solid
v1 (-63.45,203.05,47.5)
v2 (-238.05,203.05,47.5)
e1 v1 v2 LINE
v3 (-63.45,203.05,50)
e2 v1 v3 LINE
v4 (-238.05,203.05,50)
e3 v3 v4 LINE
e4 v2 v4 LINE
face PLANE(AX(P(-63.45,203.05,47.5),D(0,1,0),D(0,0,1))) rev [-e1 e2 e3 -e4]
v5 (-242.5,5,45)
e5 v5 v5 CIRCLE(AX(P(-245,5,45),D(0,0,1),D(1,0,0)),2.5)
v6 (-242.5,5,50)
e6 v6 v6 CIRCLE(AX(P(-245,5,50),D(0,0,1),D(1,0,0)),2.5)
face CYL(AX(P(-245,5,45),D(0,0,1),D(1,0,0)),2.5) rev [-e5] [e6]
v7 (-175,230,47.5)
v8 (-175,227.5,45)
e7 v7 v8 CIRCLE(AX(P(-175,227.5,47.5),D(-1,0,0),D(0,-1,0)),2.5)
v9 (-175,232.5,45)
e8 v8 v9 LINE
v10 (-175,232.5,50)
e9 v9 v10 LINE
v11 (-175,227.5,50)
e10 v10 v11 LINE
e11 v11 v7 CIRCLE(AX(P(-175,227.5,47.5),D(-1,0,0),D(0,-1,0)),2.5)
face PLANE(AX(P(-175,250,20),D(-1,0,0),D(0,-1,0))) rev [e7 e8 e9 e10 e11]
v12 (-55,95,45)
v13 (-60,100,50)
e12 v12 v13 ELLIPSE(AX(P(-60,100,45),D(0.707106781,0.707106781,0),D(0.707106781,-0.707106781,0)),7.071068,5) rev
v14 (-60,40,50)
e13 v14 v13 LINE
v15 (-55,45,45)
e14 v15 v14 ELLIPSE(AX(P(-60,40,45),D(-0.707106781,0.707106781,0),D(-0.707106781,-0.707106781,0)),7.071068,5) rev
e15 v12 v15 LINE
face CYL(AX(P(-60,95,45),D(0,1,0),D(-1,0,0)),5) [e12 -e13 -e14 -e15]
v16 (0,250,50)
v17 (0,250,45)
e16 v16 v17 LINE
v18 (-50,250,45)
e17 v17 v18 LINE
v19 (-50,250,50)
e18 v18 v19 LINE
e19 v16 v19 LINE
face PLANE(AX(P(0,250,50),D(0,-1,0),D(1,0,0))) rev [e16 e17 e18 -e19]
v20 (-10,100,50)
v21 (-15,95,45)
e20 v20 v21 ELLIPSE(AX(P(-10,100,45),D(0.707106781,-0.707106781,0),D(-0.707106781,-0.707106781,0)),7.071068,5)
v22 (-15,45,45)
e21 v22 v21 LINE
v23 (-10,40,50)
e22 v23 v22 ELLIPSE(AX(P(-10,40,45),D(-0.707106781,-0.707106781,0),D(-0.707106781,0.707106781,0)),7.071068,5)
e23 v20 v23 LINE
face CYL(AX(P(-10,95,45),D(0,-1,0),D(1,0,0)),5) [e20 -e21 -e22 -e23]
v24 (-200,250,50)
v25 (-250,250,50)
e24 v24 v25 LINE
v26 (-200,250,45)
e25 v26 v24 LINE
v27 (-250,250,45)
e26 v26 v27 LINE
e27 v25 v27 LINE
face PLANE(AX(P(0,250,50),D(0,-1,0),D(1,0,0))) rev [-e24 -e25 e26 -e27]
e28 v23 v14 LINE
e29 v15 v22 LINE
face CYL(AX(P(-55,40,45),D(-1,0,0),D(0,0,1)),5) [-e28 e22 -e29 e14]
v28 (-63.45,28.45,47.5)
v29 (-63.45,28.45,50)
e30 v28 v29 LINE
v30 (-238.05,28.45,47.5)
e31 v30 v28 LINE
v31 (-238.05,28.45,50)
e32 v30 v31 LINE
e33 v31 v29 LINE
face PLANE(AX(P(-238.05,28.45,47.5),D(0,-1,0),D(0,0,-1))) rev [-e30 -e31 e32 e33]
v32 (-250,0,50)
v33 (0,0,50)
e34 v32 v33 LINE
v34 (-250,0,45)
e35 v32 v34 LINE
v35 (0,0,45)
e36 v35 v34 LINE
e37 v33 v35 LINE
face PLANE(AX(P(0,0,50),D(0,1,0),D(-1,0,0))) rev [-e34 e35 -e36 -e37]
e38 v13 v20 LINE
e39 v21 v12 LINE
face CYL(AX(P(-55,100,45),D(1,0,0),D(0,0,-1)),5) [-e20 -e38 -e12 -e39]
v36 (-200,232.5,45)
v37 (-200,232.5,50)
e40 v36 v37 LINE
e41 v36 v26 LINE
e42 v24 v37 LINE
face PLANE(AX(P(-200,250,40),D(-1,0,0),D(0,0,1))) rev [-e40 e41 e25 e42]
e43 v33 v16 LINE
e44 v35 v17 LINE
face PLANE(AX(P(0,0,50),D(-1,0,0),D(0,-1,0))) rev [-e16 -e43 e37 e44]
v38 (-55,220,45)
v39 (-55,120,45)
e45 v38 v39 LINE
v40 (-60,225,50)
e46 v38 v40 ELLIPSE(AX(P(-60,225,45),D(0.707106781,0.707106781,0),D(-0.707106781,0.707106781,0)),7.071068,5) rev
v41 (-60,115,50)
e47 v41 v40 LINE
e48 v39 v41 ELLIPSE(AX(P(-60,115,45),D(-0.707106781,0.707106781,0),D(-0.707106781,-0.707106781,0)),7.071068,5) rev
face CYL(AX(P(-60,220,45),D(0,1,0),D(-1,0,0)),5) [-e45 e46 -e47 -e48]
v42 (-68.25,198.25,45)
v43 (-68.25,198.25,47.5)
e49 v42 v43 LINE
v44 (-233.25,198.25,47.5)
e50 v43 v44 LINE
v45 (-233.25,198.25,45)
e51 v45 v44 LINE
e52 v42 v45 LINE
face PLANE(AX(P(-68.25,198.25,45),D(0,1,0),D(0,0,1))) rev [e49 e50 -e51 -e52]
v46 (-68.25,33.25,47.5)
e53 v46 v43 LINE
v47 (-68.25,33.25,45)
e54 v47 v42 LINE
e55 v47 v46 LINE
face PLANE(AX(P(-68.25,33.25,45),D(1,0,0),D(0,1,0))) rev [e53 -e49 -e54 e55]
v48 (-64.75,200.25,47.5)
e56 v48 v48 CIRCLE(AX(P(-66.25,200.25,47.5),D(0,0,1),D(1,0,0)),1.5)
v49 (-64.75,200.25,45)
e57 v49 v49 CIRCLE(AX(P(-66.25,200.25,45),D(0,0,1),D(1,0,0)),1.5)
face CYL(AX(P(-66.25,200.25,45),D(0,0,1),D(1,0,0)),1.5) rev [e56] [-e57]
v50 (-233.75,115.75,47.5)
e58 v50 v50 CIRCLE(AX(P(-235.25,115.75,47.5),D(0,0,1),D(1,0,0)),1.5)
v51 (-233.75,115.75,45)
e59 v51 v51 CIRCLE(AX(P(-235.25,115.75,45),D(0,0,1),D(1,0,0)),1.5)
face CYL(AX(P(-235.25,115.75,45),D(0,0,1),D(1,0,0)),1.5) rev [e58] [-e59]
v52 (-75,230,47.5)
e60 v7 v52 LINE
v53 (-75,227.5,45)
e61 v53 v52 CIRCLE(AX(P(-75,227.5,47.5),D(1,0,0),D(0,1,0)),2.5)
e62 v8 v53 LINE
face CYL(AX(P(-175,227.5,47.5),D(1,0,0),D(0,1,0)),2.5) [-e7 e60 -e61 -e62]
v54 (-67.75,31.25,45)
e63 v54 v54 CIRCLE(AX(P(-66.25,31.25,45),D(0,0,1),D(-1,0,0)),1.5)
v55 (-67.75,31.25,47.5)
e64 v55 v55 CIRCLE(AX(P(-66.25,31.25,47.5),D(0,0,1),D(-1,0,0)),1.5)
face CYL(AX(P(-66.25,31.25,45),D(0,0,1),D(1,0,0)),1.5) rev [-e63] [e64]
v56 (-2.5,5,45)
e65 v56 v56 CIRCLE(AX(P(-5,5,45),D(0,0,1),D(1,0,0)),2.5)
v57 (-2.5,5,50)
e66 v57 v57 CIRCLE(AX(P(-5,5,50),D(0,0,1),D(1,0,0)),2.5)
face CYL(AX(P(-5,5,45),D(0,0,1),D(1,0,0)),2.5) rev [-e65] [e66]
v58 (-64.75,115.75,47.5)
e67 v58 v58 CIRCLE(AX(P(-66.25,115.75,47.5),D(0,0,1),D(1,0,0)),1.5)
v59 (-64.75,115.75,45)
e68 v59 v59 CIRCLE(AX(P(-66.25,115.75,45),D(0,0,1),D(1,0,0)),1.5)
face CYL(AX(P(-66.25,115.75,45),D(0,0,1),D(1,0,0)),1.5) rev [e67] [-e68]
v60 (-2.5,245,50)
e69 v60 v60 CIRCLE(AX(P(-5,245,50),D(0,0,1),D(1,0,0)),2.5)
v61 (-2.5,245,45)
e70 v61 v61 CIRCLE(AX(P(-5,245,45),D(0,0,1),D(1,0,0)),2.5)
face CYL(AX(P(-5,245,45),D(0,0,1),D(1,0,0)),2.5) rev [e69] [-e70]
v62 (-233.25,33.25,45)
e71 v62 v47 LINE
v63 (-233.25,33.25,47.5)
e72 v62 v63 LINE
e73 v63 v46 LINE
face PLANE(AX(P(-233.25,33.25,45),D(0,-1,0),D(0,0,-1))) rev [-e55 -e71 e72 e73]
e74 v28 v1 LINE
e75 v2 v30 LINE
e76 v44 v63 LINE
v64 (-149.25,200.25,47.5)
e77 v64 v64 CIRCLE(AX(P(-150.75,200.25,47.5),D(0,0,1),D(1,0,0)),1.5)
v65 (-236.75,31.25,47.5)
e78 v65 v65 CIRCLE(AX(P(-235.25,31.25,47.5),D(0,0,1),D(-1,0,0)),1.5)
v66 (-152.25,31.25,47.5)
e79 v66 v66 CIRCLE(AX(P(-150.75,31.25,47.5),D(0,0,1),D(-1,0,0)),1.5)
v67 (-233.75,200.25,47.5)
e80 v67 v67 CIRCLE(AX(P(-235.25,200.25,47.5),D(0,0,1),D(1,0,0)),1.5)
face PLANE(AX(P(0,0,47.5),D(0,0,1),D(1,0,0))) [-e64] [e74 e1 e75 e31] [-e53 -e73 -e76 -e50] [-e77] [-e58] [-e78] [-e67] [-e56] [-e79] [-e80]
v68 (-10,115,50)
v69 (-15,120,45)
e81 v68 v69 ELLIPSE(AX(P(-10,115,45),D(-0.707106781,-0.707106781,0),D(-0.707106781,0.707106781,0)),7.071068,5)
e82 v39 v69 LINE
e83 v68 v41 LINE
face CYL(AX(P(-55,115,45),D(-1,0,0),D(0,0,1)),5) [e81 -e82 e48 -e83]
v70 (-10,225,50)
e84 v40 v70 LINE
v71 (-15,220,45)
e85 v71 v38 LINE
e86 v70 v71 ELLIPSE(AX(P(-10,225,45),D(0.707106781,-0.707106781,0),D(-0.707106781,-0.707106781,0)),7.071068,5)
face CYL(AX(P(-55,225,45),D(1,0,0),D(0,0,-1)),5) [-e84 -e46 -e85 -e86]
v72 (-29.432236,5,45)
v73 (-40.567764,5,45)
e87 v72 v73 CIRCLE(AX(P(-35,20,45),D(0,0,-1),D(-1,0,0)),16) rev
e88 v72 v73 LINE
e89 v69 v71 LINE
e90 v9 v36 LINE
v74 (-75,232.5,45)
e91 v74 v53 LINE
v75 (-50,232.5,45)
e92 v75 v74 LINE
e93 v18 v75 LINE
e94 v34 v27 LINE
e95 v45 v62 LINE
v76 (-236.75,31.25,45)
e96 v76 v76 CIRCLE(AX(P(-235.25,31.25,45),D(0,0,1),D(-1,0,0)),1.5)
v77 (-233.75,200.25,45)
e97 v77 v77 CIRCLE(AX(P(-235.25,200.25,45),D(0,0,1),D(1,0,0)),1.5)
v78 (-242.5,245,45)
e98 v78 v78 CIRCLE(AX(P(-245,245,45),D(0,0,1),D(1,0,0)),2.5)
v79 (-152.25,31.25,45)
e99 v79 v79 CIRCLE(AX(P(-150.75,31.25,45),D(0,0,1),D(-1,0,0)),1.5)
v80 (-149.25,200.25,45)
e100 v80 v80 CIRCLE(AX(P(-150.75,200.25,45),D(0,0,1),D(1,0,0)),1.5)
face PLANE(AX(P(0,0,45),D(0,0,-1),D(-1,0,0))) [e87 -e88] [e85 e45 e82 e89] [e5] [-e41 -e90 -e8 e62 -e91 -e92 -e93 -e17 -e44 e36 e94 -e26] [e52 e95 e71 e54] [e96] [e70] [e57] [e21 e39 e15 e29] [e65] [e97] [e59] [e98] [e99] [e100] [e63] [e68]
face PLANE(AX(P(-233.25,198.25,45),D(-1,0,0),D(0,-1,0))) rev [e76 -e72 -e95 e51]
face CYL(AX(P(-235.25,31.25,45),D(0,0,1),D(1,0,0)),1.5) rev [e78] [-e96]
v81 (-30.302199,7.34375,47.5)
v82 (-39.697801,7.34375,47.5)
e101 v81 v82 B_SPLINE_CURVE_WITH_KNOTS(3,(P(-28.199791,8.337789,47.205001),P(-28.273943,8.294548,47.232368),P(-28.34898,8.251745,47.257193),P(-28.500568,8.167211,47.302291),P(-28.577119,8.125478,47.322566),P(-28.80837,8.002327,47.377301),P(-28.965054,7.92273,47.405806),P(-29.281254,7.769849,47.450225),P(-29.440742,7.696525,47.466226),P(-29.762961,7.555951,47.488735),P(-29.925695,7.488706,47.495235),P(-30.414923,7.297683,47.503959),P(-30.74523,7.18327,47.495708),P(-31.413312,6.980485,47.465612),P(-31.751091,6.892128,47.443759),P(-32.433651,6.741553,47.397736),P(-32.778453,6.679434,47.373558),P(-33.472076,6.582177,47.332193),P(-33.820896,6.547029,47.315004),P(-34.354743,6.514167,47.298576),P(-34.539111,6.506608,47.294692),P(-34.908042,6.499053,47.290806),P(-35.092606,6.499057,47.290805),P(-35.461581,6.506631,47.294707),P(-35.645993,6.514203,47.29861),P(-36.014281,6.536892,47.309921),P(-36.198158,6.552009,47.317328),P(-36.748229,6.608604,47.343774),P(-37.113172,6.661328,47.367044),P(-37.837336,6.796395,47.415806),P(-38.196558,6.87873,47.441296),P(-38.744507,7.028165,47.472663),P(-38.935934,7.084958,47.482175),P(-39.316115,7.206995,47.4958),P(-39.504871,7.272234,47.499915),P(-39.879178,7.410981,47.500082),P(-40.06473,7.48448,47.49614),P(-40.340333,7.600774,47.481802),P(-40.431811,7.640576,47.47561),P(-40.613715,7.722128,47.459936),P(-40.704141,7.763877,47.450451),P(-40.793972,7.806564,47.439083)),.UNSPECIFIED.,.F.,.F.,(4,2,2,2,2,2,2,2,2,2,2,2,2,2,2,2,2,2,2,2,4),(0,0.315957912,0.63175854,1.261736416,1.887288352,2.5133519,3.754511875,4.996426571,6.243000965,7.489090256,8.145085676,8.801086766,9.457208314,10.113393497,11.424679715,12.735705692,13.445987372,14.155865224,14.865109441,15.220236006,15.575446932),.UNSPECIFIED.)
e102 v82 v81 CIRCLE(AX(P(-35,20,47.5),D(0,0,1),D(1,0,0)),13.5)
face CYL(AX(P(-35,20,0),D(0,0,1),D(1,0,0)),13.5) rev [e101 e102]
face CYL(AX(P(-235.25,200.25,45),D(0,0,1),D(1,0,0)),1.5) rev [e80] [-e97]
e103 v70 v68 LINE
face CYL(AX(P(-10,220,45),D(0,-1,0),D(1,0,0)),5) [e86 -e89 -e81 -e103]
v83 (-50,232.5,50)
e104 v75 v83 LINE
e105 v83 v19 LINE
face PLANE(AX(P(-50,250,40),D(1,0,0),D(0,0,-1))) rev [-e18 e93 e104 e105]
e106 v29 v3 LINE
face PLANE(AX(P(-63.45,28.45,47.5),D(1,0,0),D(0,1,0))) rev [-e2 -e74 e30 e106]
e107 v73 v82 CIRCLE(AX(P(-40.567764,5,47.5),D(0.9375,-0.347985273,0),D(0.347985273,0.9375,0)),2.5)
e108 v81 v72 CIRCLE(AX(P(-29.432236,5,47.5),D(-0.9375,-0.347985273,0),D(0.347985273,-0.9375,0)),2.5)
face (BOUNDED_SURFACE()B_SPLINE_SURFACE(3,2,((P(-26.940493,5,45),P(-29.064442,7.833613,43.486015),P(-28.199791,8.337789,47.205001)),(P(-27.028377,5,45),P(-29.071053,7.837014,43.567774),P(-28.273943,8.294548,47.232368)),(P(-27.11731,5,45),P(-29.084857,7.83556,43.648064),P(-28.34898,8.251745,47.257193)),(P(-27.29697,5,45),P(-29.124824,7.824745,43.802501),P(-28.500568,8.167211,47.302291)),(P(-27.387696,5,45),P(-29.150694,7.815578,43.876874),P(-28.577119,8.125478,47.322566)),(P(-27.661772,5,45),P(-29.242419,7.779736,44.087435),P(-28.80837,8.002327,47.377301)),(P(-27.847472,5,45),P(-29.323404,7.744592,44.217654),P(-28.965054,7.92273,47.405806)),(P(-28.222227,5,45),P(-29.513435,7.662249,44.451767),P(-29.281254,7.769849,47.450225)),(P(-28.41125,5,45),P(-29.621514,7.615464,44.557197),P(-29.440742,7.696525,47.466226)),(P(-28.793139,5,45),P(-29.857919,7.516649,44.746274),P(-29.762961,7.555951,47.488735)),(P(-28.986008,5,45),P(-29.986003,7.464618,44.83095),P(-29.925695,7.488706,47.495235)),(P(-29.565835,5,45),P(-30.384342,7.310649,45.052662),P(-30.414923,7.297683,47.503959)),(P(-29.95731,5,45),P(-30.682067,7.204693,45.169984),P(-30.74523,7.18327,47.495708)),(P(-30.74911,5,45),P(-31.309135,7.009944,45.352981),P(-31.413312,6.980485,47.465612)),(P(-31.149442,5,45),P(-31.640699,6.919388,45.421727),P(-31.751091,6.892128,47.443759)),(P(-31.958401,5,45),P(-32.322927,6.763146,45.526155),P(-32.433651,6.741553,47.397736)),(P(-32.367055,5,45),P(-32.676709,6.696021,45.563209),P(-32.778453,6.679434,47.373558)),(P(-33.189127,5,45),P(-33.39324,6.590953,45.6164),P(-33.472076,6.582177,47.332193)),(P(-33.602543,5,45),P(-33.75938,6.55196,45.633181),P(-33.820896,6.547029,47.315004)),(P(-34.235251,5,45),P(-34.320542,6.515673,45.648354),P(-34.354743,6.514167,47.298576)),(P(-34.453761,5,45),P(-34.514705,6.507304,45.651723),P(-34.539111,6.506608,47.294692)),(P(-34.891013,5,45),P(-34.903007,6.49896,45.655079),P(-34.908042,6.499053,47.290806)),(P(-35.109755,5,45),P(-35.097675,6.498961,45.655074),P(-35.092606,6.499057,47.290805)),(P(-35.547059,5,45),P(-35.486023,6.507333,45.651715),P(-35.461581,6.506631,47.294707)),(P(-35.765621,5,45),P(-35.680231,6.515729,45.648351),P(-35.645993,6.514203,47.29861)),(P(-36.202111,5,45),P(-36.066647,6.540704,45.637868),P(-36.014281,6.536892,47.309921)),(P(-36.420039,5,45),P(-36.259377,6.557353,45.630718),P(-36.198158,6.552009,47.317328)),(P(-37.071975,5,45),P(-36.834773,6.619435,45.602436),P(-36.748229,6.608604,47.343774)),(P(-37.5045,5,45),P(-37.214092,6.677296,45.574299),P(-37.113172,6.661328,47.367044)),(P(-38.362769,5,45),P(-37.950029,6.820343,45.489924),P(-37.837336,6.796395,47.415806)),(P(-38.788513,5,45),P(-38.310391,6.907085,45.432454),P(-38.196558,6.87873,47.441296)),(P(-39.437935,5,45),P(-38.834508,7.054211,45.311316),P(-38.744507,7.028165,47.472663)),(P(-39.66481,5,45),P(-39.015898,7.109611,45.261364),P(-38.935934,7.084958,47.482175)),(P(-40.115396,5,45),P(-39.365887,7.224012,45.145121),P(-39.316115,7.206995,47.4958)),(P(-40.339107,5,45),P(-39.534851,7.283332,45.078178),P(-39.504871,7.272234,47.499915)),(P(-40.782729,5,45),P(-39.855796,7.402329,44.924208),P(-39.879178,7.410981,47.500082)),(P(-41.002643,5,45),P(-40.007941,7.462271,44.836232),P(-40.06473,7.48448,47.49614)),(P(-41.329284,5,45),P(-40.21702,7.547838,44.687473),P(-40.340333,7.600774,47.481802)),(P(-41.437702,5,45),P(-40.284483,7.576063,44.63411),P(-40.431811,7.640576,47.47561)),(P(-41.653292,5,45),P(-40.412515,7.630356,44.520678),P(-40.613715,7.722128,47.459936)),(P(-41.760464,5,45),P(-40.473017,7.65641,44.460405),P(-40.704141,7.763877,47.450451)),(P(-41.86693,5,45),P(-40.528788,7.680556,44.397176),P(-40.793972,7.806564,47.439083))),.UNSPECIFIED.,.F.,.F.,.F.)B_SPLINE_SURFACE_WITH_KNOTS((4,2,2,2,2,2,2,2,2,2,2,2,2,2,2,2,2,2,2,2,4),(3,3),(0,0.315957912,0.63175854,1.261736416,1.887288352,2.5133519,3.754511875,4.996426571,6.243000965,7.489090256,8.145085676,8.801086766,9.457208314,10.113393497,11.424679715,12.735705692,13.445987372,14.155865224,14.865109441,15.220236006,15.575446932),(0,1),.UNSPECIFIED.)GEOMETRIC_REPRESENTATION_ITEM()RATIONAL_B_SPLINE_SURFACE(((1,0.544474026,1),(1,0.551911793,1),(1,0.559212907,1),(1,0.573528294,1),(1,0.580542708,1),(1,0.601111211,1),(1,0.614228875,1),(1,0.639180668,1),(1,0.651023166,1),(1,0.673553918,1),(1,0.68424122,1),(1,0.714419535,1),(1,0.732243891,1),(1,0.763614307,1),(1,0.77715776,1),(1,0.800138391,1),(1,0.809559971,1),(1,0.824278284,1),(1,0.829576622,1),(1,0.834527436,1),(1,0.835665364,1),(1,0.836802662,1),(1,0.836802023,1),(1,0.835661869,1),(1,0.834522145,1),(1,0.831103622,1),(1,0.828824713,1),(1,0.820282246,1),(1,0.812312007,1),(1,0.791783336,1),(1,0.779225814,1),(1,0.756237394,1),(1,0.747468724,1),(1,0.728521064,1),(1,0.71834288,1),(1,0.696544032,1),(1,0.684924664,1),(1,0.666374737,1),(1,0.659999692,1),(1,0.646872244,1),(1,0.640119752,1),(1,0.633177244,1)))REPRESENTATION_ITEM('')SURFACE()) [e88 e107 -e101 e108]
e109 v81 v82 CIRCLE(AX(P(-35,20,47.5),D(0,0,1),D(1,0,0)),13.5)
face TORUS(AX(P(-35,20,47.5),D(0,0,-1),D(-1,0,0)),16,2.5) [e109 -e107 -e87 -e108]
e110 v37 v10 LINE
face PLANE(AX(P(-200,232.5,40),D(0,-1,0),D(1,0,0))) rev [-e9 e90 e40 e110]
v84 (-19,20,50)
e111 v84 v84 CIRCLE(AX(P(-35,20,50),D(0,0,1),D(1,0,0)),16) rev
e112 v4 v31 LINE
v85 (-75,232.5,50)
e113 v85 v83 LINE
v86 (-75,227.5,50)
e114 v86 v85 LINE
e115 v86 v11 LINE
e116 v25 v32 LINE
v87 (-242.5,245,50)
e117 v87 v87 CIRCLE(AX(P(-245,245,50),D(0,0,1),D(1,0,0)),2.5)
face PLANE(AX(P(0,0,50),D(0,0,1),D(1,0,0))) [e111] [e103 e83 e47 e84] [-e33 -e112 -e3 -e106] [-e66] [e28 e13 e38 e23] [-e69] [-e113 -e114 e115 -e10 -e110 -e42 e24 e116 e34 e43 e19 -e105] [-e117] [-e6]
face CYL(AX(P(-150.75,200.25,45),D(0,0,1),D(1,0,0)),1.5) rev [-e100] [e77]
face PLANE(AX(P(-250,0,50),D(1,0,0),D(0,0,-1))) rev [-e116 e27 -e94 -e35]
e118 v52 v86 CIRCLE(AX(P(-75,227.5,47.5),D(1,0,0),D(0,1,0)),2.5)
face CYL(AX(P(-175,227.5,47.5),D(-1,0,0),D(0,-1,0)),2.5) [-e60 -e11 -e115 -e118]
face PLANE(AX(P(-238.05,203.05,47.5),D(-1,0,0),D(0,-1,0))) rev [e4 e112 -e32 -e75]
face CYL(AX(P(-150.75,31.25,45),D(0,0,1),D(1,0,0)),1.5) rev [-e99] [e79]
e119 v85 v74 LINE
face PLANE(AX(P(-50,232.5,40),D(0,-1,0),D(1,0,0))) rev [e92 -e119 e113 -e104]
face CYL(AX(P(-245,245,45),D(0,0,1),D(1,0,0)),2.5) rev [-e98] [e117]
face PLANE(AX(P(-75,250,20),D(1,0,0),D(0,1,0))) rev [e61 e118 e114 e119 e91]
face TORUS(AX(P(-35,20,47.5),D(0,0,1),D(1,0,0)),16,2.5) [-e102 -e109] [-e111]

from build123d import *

# Parameters (mm, degrees)
SKETCH1_W                        = 250
SKETCH1_H                        = 250
BOSS_EXTRUDE1_DEPTH              = 50
SKETCH2_W                        = 40
SKETCH2_H                        = 100
SKETCH2_H_2                      = 50
CUT_EXTRUDE1_DEPTH               = 45
FILLET1_R                        = 5
FILLET2_R                        = 5
SKETCH5_R                        = 6.25
CUT_EXTRUDE2_DEPTH               = 22
FILLET5_R                        = 1.5
LPATTERN4_COUNT                  = 10
LPATTERN4_PITCH                  = 16.5
LPATTERN4_COUNT_DIR2             = 10
LPATTERN4_PITCH_DIR2             = 16.5
FILLET5_OF_LPATTERN4_R           = 1.5
CUT_EXTRUDE4_DEPTH               = 45
SKETCH8_W                        = 100
SKETCH8_H                        = 20
CUT_EXTRUDE5_DEPTH               = 30
FILLET6_R                        = 2.5
FILLET7_R                        = 2
SKETCH10_R                       = 13.5
CUT_EXTRUDE6_DEPTH               = 358.071421427
SKETCH4_W                        = 25
SKETCH4_H                        = 17.5
CUT_EXTRUDE7_DEPTH               = 10
VERRUNDUNG1_R                    = 2.5
SKIZZE2_W                        = 25
SKIZZE2_H                        = 5
AUFSATZ_LINEAR_AUSTRAGEN1_DEPTH  = 12.5
AUFSATZ_LINEAR_AUSTRAGEN2_DEPTH  = 10
SKIZZE11_W                       = 164
SKIZZE11_H                       = 164
SCHNITT_LINEAR_AUSTRAGEN6_DEPTH  = 10
SKIZZE12_W                       = 174
SKIZZE12_H                       = 174
SCHNITT_LINEAR_AUSTRAGEN7_DEPTH  = 2.5
SKIZZE13_R                       = 1.5
SCHNITT_LINEAR_AUSTRAGEN8_DEPTH  = 2.5
SKIZZE14_W                       = 10
SKIZZE14_H                       = 10
AUFSATZ_LINEAR_AUSTRAGEN3_DEPTH  = 45
SKIZZE16_W                       = 45
SKIZZE16_H                       = 250
SCHNITT_LINEAR_AUSTRAGEN9_DEPTH  = 358.071421427
SKIZZE17_R                       = 2.5
SCHNITT_LINEAR_AUSTRAGEN10_DEPTH = 5
SKIZZE18_W                       = 174.6
SKIZZE18_H                       = 174.6
SCHNITT_LINEAR_AUSTRAGEN11_DEPTH = 2.5
SKIZZE19_W                       = 165
SKIZZE19_H                       = 165
SCHNITT_LINEAR_AUSTRAGEN12_DEPTH = 2.5


with BuildPart() as part:
    # Sketch1 → Boss-Extrude1 (new body)
    with BuildSketch(Plane.XY):
        with Locations((-125, 125)):
            Rectangle(SKETCH1_W, SKETCH1_H)
    extrude(amount=BOSS_EXTRUDE1_DEPTH)

    # Sketch2 → Cut-Extrude1 (cut)
    with BuildSketch(Plane.XY.offset(50)):
        with Locations((-35, 170)):
            Rectangle(SKETCH2_W, SKETCH2_H)
        with Locations((-35, 70)):
            Rectangle(SKETCH2_W, SKETCH2_H_2)
    extrude(amount=-CUT_EXTRUDE1_DEPTH, mode=Mode.SUBTRACT)

    # Fillet1
    fillet1_edges = [part.edges().sort_by_distance(p)[0] for p in [
        (-55, 170, 50),
        (-35, 120, 50),
        (-15, 170, 50),
        (-35, 220, 50),
    ]]
    fillet(fillet1_edges, radius=FILLET1_R)

    # Fillet2
    fillet2_edges = [part.edges().sort_by_distance(p)[0] for p in [
        (-55, 70, 50),
        (-35, 45, 50),
        (-15, 70, 50),
        (-35, 95, 50),
    ]]
    fillet(fillet2_edges, radius=FILLET2_R)

    # Sketch5 → Cut-Extrude2 (cut)
    with BuildSketch(Plane.XY.offset(50)):
        with Locations((-225, 190)):
            Circle(SKETCH5_R)
    cut_extrude2 = extrude(amount=-CUT_EXTRUDE2_DEPTH, mode=Mode.SUBTRACT)

    # Fillet5
    fillet5_edges = [part.edges().sort_by_distance(p)[0] for p in [
        (-231.25, 190, 50),
    ]]
    fillet(fillet5_edges, radius=FILLET5_R)

    # LPattern4: Cut-Extrude2 10 × 10
    with Locations(*[(i * LPATTERN4_PITCH, -j * LPATTERN4_PITCH_DIR2, 0) for i in range(LPATTERN4_COUNT) for j in range(LPATTERN4_COUNT_DIR2) if (i, j) != (0, 0)]):
        add(cut_extrude2, mode=Mode.SUBTRACT)

    # Fillet5 of LPattern4
    fillet5_of_lpattern4_edges = [part.edges().sort_by_distance(p)[0] for p in [
        (-231.25, 173.5, 50),
        (-231.25, 157, 50),
        (-231.25, 140.5, 50),
        (-231.25, 124, 50),
        (-231.25, 107.5, 50),
        (-231.25, 91, 50),
        (-231.25, 74.5, 50),
        (-231.25, 58, 50),
        (-231.25, 41.5, 50),
        (-214.75, 190, 50),
        (-214.75, 173.5, 50),
        (-214.75, 157, 50),
        (-214.75, 140.5, 50),
        (-214.75, 124, 50),
        (-214.75, 107.5, 50),
        (-214.75, 91, 50),
        (-214.75, 74.5, 50),
        (-214.75, 58, 50),
        (-214.75, 41.5, 50),
        (-198.25, 190, 50),
        (-198.25, 173.5, 50),
        (-198.25, 157, 50),
        (-198.25, 140.5, 50),
        (-198.25, 124, 50),
        (-198.25, 107.5, 50),
        (-198.25, 91, 50),
        (-198.25, 74.5, 50),
        (-198.25, 58, 50),
        (-198.25, 41.5, 50),
        (-181.75, 190, 50),
        (-181.75, 173.5, 50),
        (-181.75, 157, 50),
        (-181.75, 140.5, 50),
        (-181.75, 124, 50),
        (-181.75, 107.5, 50),
        (-181.75, 91, 50),
        (-181.75, 74.5, 50),
        (-181.75, 58, 50),
        (-181.75, 41.5, 50),
        (-165.25, 190, 50),
        (-165.25, 173.5, 50),
        (-165.25, 157, 50),
        (-165.25, 140.5, 50),
        (-165.25, 124, 50),
        (-165.25, 107.5, 50),
        (-165.25, 91, 50),
        (-165.25, 74.5, 50),
        (-165.25, 58, 50),
        (-165.25, 41.5, 50),
        (-148.75, 190, 50),
        (-148.75, 173.5, 50),
        (-148.75, 157, 50),
        (-148.75, 140.5, 50),
        (-148.75, 124, 50),
        (-148.75, 107.5, 50),
        (-148.75, 91, 50),
        (-148.75, 74.5, 50),
        (-148.75, 58, 50),
        (-148.75, 41.5, 50),
        (-132.25, 190, 50),
        (-132.25, 173.5, 50),
        (-132.25, 157, 50),
        (-132.25, 140.5, 50),
        (-132.25, 124, 50),
        (-132.25, 107.5, 50),
        (-132.25, 91, 50),
        (-132.25, 74.5, 50),
        (-132.25, 58, 50),
        (-132.25, 41.5, 50),
        (-115.75, 190, 50),
        (-115.75, 173.5, 50),
        (-115.75, 157, 50),
        (-115.75, 140.5, 50),
        (-115.75, 124, 50),
        (-115.75, 107.5, 50),
        (-115.75, 91, 50),
        (-115.75, 74.5, 50),
        (-115.75, 58, 50),
        (-115.75, 41.5, 50),
        (-99.25, 190, 50),
        (-99.25, 173.5, 50),
        (-99.25, 157, 50),
        (-99.25, 140.5, 50),
        (-99.25, 124, 50),
        (-99.25, 107.5, 50),
        (-99.25, 91, 50),
        (-99.25, 74.5, 50),
        (-99.25, 58, 50),
        (-99.25, 41.5, 50),
        (-82.75, 190, 50),
        (-82.75, 173.5, 50),
        (-82.75, 157, 50),
        (-82.75, 140.5, 50),
        (-82.75, 124, 50),
        (-82.75, 107.5, 50),
        (-82.75, 91, 50),
        (-82.75, 74.5, 50),
        (-82.75, 58, 50),
        (-82.75, 41.5, 50),
    ]]
    fillet(fillet5_of_lpattern4_edges, radius=FILLET5_OF_LPATTERN4_R)

    # Sketch7 → Cut-Extrude4 (cut)
    with BuildSketch(Plane(origin=(0, 0, 0), x_dir=(-1, 0, 0), z_dir=(0, 0, -1))):
        Polygon((5, 245), (245, 245), (245, 5), (5, 5), (5, 40), (60, 40), (60, 100), (5, 100), (5, 115), (60, 115), (60, 225), (5, 225), align=None)
    extrude(amount=-CUT_EXTRUDE4_DEPTH, mode=Mode.SUBTRACT)

    # Sketch8 → Cut-Extrude5 (cut)
    with BuildSketch(Plane.XY.offset(50)):
        with Locations((-125, 240)):
            Rectangle(SKETCH8_W, SKETCH8_H)
    extrude(amount=-CUT_EXTRUDE5_DEPTH, mode=Mode.SUBTRACT)

    # Fillet6
    fillet6_edges = [part.edges().sort_by_distance(p)[0] for p in [
        (-125, 230, 45),
        (-125, 230, 50),
    ]]
    fillet(fillet6_edges, radius=FILLET6_R - 0.0001)  # a hair under: the kernel refuses the full size

    # Fillet7
    fillet7_edges = [part.edges().sort_by_distance(p)[0] for p in [
        (-125, 245, 20),
        (-125, 250, 20),
    ]]
    fillet(fillet7_edges, radius=FILLET7_R)

    # Sketch10 → Cut-Extrude6 (cut, through all)
    with BuildSketch(Plane.XY.offset(50)):
        with Locations((-35, 20)):
            Circle(SKETCH10_R)
    extrude(amount=-CUT_EXTRUDE6_DEPTH, mode=Mode.SUBTRACT)

    # Sketch4 → Cut-Extrude7 (cut)
    with BuildSketch(Plane.XY.offset(50)):
        with Locations((-187.5, 241.25)):
            Rectangle(SKETCH4_W, SKETCH4_H)
        with Locations((-62.5, 241.25)):
            Rectangle(SKETCH4_W, SKETCH4_H)
    extrude(amount=-CUT_EXTRUDE7_DEPTH, mode=Mode.SUBTRACT)

    # Verrundung1
    verrundung1_edges = [part.edges().sort_by_distance(p)[0] for p in [
        (-48.5, 20, 45),
        (-48.5, 20, 50),
    ]]
    fillet(verrundung1_edges, radius=VERRUNDUNG1_R - 0.0001)  # a hair under: the kernel refuses the full size

    # Skizze2 → Aufsatz-Linear austragen1 (add)
    with BuildSketch(Plane.XZ.offset(-245)):
        with Locations((-187.5, 37.5)):
            Rectangle(SKIZZE2_W, SKIZZE2_H)
        with Locations((-62.5, 37.5)):
            Rectangle(SKIZZE2_W, SKIZZE2_H)
    extrude(amount=AUFSATZ_LINEAR_AUSTRAGEN1_DEPTH)

    # Skizze4 → Aufsatz-Linear austragen2 (add)
    with BuildSketch(Plane(origin=(0, 0, 45), x_dir=(-1, 0, 0), z_dir=(0, 0, -1))):
        Polygon((50, 232.5), (75, 232.5), (75, 227.5), (49, 227.5), (49, 245), (50, 245), align=None)
        Polygon((200, 232.5), (175, 232.5), (175, 227.5), (201, 227.5), (201, 245), (200, 245), align=None)
    extrude(amount=AUFSATZ_LINEAR_AUSTRAGEN2_DEPTH)

    # Skizze11 → Schnitt-Linear austragen6 (cut)
    with BuildSketch(Plane.XY.offset(50)):
        with Locations((-150.75, 115.75)):
            Rectangle(SKIZZE11_W, SKIZZE11_H)
    extrude(amount=-SCHNITT_LINEAR_AUSTRAGEN6_DEPTH, mode=Mode.SUBTRACT)

    # Skizze12 → Schnitt-Linear austragen7 (cut)
    with BuildSketch(Plane.XY.offset(50)):
        with Locations((-150.75, 115.75)):
            Rectangle(SKIZZE12_W, SKIZZE12_H)
    extrude(amount=-SCHNITT_LINEAR_AUSTRAGEN7_DEPTH, mode=Mode.SUBTRACT)

    # Skizze13 → Schnitt-Linear austragen8 (cut)
    with BuildSketch(Plane.XY.offset(47.5)):
        with Locations((-235.25, 200.25)):
            Circle(SKIZZE13_R)
        with Locations((-150.75, 200.25)):
            Circle(SKIZZE13_R)
        with Locations((-66.25, 200.25)):
            Circle(SKIZZE13_R)
        with Locations((-235.25, 115.75)):
            Circle(SKIZZE13_R)
        with Locations((-66.25, 115.75)):
            Circle(SKIZZE13_R)
        with Locations(Location((-66.25, 31.25, 0), (0, 0, 180))):
            Circle(SKIZZE13_R)
        with Locations(Location((-150.75, 31.25, 0), (0, 0, 180))):
            Circle(SKIZZE13_R)
        with Locations(Location((-235.25, 31.25, 0), (0, 0, 180))):
            Circle(SKIZZE13_R)
    extrude(amount=-SCHNITT_LINEAR_AUSTRAGEN8_DEPTH, mode=Mode.SUBTRACT)

    # Skizze14 → Aufsatz-Linear austragen3 (add)
    with BuildSketch(Plane(origin=(0, 0, 45), x_dir=(-1, 0, 0), z_dir=(0, 0, -1))):
        with Locations((5, 245)):
            Rectangle(SKIZZE14_W, SKIZZE14_H)
        with Locations((245, 245)):
            Rectangle(SKIZZE14_W, SKIZZE14_H)
        with Locations((245, 5)):
            Rectangle(SKIZZE14_W, SKIZZE14_H)
        with Locations((5, 5)):
            Rectangle(SKIZZE14_W, SKIZZE14_H)
    extrude(amount=AUFSATZ_LINEAR_AUSTRAGEN3_DEPTH)

    # Skizze16 → Schnitt-Linear austragen9 (cut, through all)
    with BuildSketch(Plane.ZY.offset(250)):
        with Locations((22.5, 125)):
            Rectangle(SKIZZE16_W, SKIZZE16_H)
    extrude(amount=-SCHNITT_LINEAR_AUSTRAGEN9_DEPTH, mode=Mode.SUBTRACT)

    # Skizze17 → Schnitt-Linear austragen10 (cut)
    with BuildSketch(Plane.XY.offset(50)):
        with Locations((-245, 245)):
            Circle(SKIZZE17_R)
        with Locations((-5, 245)):
            Circle(SKIZZE17_R)
        with Locations((-5, 5)):
            Circle(SKIZZE17_R)
        with Locations((-245, 5)):
            Circle(SKIZZE17_R)
    extrude(amount=-SCHNITT_LINEAR_AUSTRAGEN10_DEPTH, mode=Mode.SUBTRACT)

    # Skizze18 → Schnitt-Linear austragen11 (cut)
    with BuildSketch(Plane.XY.offset(50)):
        with Locations((-150.75, 115.75)):
            Rectangle(SKIZZE18_W, SKIZZE18_H)
    extrude(amount=-SCHNITT_LINEAR_AUSTRAGEN11_DEPTH, mode=Mode.SUBTRACT)

    # Skizze19 → Schnitt-Linear austragen12 (cut)
    with BuildSketch(Plane.XY.offset(47.5)):
        with Locations((-150.75, 115.75)):
            Rectangle(SKIZZE19_W, SKIZZE19_H)
    extrude(amount=-SCHNITT_LINEAR_AUSTRAGEN12_DEPTH, mode=Mode.SUBTRACT)


solid = part.part
